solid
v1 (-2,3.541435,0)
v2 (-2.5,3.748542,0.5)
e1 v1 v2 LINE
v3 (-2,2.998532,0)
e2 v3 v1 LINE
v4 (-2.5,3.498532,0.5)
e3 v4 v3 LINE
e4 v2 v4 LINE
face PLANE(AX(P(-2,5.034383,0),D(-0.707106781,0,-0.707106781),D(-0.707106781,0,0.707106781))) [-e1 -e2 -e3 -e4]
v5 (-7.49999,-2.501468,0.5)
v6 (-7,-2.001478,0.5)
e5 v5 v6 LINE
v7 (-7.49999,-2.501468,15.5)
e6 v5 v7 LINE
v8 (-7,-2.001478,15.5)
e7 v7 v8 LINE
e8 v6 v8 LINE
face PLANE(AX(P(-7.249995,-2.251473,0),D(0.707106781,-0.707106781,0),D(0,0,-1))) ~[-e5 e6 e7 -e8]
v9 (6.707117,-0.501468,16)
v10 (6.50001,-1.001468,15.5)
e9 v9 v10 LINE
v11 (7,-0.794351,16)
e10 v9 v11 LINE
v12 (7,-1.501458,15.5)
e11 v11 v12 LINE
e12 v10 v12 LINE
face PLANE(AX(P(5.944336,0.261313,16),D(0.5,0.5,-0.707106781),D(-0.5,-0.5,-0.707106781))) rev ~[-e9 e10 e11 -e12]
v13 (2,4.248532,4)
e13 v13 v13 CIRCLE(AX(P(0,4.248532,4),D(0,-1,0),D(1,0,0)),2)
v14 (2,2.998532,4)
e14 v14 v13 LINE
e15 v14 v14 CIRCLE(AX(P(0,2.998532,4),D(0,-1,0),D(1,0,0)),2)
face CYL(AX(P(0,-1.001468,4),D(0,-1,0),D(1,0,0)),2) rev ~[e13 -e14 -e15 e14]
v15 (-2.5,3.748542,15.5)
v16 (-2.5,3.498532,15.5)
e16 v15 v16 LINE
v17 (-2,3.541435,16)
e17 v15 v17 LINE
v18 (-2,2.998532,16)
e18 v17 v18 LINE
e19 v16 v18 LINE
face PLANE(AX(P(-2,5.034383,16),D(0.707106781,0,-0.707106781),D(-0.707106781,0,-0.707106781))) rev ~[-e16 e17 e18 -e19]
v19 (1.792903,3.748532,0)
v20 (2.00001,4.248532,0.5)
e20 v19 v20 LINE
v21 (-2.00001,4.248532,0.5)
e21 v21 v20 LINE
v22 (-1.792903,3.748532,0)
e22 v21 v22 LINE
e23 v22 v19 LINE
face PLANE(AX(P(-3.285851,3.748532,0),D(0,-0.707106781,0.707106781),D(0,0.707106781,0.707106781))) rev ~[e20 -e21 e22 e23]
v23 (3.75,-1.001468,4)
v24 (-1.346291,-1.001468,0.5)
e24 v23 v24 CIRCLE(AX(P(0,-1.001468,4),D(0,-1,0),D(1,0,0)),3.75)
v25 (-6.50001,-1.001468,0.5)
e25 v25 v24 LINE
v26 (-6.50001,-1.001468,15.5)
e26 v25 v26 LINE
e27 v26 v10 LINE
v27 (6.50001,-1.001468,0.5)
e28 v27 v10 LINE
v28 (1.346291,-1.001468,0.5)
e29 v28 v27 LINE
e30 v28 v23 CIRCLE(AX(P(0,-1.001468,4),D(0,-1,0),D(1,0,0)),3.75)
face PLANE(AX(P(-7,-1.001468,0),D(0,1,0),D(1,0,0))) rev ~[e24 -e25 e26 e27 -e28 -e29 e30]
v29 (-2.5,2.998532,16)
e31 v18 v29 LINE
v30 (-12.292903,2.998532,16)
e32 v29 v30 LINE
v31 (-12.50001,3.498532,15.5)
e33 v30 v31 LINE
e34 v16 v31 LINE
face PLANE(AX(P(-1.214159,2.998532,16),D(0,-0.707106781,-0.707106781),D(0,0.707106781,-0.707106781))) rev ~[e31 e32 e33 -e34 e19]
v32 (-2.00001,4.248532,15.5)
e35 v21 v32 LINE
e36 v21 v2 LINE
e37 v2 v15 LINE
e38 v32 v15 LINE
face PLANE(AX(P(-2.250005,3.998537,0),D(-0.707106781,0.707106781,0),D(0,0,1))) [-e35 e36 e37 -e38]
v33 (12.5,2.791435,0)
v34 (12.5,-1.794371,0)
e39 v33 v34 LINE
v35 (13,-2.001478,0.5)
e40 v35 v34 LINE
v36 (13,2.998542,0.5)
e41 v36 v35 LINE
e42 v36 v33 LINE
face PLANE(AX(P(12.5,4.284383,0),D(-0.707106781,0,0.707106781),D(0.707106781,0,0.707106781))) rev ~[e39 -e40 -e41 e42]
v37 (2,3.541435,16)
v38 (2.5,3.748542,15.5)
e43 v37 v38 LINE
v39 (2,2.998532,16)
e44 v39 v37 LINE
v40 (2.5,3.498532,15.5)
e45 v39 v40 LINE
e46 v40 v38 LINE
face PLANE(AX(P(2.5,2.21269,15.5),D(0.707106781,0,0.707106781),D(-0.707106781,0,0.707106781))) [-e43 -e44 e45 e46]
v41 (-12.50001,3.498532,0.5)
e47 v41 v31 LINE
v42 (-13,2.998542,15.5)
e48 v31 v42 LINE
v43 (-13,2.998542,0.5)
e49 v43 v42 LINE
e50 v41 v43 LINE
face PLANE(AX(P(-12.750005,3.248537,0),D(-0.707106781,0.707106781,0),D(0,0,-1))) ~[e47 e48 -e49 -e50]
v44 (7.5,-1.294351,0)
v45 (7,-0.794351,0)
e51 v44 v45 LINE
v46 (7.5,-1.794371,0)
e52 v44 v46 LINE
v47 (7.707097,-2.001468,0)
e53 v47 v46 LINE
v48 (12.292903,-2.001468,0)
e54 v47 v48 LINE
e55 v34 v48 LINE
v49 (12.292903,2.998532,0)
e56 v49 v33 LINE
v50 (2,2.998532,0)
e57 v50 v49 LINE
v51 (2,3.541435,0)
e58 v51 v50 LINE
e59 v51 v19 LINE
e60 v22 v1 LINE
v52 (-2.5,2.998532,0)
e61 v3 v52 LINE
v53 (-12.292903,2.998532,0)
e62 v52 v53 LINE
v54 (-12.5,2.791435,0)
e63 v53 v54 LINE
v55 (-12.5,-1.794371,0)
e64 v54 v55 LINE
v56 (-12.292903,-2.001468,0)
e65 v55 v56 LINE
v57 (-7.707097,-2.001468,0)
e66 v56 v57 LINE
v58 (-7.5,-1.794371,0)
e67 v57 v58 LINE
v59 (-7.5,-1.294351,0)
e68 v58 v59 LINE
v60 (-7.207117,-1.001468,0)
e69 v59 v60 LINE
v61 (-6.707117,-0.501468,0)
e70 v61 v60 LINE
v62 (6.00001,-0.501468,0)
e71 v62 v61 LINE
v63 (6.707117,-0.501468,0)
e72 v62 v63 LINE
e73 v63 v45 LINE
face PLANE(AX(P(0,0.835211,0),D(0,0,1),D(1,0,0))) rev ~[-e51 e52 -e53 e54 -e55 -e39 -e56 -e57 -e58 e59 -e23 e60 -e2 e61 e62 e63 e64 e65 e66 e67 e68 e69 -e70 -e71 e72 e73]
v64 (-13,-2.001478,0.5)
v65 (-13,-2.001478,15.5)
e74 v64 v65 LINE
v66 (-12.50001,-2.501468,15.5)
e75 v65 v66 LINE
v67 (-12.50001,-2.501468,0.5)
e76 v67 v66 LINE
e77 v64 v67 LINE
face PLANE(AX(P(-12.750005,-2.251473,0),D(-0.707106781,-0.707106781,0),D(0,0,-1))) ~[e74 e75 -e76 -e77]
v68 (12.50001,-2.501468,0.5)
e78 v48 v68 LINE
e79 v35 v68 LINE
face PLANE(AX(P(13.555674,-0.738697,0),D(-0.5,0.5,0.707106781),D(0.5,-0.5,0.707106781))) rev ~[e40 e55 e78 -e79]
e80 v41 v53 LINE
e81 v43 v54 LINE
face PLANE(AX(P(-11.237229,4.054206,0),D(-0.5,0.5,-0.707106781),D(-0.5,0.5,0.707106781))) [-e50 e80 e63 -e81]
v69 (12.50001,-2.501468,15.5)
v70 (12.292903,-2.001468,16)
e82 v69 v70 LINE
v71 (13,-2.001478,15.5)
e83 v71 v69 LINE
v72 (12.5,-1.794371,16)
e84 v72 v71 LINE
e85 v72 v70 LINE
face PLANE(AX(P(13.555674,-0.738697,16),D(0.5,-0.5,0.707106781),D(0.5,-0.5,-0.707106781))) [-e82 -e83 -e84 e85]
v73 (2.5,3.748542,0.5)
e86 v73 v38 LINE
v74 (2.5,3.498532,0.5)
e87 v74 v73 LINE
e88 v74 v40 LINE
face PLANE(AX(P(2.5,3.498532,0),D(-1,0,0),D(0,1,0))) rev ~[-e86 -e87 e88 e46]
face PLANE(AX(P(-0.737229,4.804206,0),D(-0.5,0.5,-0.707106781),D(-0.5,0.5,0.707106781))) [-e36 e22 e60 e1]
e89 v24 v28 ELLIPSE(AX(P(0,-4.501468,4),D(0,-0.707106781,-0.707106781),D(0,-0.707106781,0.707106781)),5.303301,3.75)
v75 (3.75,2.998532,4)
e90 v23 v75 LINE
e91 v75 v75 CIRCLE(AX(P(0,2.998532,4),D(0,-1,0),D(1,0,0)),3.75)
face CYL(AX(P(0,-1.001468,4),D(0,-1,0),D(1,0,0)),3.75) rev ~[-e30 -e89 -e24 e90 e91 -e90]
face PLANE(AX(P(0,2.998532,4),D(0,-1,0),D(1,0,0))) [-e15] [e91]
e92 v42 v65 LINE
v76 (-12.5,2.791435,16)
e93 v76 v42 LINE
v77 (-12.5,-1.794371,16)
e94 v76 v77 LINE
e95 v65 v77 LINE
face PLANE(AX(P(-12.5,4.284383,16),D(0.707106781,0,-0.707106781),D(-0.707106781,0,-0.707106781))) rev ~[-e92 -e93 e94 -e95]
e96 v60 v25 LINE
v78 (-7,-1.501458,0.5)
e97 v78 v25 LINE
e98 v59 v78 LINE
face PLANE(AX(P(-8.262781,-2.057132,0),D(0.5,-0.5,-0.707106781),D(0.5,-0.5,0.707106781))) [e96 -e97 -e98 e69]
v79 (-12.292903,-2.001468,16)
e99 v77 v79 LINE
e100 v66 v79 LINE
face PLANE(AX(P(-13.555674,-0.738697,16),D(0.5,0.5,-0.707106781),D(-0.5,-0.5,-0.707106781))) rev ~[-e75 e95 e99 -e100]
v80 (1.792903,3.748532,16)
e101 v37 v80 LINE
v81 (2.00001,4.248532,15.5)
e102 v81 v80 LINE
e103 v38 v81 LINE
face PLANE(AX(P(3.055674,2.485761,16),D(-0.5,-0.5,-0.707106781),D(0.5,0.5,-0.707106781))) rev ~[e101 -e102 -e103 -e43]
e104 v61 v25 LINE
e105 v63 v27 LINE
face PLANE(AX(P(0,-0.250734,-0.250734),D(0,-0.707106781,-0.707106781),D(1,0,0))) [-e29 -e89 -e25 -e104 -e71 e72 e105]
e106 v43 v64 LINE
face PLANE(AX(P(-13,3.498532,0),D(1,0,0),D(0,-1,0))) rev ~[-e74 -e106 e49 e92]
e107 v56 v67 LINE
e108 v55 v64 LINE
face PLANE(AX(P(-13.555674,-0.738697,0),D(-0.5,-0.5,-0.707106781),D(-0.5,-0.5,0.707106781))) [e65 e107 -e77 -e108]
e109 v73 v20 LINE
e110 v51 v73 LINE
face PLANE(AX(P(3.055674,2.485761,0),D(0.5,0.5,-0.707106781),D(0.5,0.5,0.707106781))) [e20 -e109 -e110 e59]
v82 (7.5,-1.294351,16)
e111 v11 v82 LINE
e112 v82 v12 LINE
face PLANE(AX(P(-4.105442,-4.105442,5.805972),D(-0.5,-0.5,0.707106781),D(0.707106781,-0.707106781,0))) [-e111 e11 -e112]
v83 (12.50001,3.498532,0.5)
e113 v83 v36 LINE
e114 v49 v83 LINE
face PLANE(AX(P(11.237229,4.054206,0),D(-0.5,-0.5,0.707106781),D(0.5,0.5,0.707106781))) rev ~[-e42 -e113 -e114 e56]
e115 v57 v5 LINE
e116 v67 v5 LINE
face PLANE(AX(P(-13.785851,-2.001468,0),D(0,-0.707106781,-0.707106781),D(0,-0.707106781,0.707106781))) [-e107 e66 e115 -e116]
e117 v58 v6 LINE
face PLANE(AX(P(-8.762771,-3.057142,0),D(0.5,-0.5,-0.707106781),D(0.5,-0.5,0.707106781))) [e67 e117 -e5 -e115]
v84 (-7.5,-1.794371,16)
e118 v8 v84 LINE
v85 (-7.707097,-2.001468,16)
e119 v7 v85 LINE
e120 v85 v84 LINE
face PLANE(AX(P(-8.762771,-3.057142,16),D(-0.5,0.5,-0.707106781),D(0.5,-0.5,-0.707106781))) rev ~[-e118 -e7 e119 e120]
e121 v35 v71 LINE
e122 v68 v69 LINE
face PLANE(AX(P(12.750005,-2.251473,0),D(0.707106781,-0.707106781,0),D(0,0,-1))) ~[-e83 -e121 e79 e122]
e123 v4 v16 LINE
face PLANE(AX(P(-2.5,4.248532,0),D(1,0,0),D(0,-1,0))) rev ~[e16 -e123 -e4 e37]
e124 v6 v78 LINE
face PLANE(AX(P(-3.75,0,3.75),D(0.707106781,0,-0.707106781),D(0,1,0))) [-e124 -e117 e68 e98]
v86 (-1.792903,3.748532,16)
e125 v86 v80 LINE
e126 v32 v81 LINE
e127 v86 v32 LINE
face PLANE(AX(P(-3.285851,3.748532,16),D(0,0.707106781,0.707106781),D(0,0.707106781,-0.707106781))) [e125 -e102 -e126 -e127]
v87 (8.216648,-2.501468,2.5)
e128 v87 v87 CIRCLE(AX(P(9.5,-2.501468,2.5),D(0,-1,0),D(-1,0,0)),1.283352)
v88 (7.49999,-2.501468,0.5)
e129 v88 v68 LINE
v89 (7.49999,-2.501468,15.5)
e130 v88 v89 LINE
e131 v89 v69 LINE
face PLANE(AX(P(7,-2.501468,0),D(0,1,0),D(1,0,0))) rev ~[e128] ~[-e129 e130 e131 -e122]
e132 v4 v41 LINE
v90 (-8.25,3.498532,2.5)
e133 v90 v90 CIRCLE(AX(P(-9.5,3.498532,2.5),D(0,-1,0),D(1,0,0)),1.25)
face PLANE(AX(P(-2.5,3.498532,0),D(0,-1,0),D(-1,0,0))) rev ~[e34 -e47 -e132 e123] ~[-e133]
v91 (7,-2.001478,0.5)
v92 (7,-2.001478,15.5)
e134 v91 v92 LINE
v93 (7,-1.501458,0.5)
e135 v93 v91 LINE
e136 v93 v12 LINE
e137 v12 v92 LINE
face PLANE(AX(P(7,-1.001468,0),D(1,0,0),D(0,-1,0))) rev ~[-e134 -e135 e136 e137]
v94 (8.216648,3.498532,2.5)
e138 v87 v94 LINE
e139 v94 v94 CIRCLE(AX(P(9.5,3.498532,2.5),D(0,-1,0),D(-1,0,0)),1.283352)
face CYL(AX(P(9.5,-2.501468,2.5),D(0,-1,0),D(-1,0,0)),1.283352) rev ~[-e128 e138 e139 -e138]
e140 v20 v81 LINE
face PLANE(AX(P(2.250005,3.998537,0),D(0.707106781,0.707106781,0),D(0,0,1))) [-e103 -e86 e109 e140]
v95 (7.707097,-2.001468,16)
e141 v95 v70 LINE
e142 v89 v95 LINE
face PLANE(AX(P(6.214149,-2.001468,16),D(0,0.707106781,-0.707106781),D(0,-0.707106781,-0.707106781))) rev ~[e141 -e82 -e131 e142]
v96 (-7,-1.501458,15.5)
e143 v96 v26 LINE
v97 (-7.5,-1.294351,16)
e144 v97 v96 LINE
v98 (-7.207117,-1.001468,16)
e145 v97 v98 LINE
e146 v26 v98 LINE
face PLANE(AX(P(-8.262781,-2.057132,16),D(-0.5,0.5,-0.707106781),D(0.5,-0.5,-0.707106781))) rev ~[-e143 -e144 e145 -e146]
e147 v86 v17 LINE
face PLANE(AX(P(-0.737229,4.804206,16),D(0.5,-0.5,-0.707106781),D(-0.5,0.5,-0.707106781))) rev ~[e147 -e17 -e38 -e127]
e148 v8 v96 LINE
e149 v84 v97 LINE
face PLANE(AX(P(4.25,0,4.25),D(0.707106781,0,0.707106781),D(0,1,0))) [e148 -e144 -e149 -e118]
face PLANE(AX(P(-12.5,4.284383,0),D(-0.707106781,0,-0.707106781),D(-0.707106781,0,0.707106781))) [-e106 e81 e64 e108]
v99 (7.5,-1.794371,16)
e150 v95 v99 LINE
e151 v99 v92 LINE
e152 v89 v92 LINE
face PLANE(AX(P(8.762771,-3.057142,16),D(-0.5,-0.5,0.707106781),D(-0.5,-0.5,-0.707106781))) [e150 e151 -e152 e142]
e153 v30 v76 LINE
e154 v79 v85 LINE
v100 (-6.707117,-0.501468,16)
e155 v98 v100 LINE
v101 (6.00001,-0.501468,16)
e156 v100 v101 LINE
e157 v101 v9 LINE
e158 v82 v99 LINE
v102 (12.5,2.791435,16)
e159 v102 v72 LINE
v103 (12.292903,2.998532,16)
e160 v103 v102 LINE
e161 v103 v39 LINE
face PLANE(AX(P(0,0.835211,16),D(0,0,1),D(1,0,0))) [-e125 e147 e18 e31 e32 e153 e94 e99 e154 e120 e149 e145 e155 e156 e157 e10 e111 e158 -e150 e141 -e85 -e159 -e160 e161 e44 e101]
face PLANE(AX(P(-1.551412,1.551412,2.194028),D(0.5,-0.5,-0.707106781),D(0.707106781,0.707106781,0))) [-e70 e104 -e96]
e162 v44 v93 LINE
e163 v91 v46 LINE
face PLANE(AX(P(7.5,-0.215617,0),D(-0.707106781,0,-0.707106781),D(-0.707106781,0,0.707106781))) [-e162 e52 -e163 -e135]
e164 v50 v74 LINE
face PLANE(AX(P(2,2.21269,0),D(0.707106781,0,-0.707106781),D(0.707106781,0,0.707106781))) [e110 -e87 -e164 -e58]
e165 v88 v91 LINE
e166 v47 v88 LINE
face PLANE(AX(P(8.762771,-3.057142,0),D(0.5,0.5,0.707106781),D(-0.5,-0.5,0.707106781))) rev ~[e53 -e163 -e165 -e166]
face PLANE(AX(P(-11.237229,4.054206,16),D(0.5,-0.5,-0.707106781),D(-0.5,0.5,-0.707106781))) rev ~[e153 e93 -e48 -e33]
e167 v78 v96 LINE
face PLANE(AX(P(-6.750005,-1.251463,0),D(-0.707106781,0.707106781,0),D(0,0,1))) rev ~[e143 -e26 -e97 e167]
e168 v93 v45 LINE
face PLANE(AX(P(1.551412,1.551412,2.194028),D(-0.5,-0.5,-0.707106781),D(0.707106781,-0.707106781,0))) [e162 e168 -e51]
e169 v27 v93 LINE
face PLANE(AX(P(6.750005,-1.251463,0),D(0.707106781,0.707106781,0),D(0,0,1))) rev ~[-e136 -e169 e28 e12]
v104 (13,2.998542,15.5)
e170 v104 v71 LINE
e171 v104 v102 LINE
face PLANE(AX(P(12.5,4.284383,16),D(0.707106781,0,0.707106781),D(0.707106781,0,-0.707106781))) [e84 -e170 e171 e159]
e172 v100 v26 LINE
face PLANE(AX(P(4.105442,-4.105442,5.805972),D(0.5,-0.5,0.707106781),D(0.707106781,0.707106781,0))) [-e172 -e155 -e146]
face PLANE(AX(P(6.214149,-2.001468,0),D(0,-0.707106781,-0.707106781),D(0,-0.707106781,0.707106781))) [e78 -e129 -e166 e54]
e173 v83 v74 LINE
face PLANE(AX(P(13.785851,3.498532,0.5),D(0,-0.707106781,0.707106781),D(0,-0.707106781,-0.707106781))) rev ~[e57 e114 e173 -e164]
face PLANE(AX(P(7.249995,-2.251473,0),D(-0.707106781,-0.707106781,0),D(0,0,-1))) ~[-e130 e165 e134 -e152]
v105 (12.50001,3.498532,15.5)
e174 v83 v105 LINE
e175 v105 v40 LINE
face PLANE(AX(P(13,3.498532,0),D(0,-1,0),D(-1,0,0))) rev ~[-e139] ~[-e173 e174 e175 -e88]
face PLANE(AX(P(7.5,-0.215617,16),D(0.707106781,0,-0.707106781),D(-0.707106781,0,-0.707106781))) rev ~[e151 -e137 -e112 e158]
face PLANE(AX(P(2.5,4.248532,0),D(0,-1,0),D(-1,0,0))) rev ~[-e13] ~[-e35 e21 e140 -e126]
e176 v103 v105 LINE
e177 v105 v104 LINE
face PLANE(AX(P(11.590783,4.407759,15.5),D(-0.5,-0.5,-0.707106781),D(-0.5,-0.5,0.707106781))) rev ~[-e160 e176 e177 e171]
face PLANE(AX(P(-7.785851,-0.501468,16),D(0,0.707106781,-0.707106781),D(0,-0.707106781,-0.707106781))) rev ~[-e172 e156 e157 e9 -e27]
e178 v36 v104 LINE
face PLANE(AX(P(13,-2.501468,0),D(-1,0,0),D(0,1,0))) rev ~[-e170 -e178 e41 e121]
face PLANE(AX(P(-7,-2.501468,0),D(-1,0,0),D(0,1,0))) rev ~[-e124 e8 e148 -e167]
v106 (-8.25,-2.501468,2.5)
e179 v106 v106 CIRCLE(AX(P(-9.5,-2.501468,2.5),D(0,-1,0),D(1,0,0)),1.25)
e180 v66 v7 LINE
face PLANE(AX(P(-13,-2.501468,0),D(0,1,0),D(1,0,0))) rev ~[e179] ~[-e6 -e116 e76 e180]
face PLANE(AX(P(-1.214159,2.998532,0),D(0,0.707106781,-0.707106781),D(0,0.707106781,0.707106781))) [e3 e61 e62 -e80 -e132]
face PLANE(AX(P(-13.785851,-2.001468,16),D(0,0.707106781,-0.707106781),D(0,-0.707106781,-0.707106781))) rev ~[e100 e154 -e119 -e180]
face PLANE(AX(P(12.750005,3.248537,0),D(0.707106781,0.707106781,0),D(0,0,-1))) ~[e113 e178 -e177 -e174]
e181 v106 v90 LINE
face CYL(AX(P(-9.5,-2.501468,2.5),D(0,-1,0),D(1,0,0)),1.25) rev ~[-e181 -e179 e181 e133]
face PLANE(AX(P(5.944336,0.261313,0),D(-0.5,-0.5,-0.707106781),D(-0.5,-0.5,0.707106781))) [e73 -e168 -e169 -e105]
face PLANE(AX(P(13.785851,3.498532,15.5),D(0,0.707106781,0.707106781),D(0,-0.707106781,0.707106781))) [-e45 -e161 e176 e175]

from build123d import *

# Parameters (mm, degrees)
F1_DEPTH      = 16
F3_R          = 1.25
F4_DEPTH      = 25
F5_R          = 2
F6_DEPTH      = 25
F5_R_2        = 3.75
F7_DEPTH      = 4
F8_SIZE       = 0.49999
F9_T1_DEPTH   = 3.278775627
F9_T3_DEPTH   = 7.571702988
F9_T5_DEPTH   = 3.278775627
F9_T7_DEPTH   = 6.571702988
F9_T9_DEPTH   = 7.571702988
F9_T11_DEPTH  = 3.278775627
F9_T13_DEPTH  = 3.278775627
F9_T15_DEPTH  = 3.278775627
F9_T17_DEPTH  = 7.571702988
F9_T19_DEPTH  = 3.278775627
F9_T24_DEPTH  = 12.571692988
F9_T29_DEPTH  = 2.821692988
F9_T34_DEPTH  = 3.278775627
F9_T39_DEPTH  = 3.278775627
F9_T44_DEPTH  = 2.821692988
F9_T49_DEPTH  = 3.071702988
F9_T54_DEPTH  = 12.571692988
F9_T59_DEPTH  = 3.278775627
F9_T65_DEPTH  = 15.571702988
F9_T71_DEPTH  = 3.278775627
F9_T77_DEPTH  = 3.071702988
F9_T82_DEPTH  = 12.571692988
F9_T87_DEPTH  = 2.821692988
F9_T92_DEPTH  = 3.278775627
F9_T97_DEPTH  = 3.278775627
F9_T102_DEPTH = 2.821692988
F9_T107_DEPTH = 3.071702988
F9_T112_DEPTH = 12.571692988
F9_T117_DEPTH = 3.278775627
F9_T123_DEPTH = 15.571702988
F9_T129_DEPTH = 3.278775627
F9_T135_DEPTH = 3.071702988


# Not quite as in the source:
# - a fillet or chamfer that OpenCascade refuses, or shapes differently, is made with other operations: its cross-section is extruded or revolved along the edge and cut away or added
# - a fillet or chamfer is up to 0.001 mm smaller than in the source, because OpenCascade refuses the exact size


with BuildPart() as f1:
    # F0 (on Top) → F1 (new body)
    with BuildSketch(Plane.XY):
        Polygon((-2.5, 3.4985319469), (-13, 3.4985319469), (-13, -2.5014680531), (-7, -2.5014680531), (-7, -1.0014680531), (7, -1.0014680531), (7, -2.5014680531), (13, -2.5014680531), (13, 3.4985319469), (2.5, 3.4985319469), (2.5, 4.2485319469), (-2.5, 4.2485319469), align=None)
    extrude(amount=F1_DEPTH)

    # F3 (on offset) → F4 (cut)
    with BuildSketch(Plane.XZ.offset(2.5014680531)):
        with Locations((-9.5, 2.5)):
            Circle(F3_R)
        with BuildLine():
            ThreePointArc((10.7833518404, 2.5), (9.5, 3.7833518404), (8.2166481596, 2.5))
            ThreePointArc((8.2166481596, 2.5), (9.5, 1.2166481596), (10.7833518404, 2.5))
        make_face()
    extrude(amount=-F4_DEPTH, mode=Mode.SUBTRACT)

    # F5 (on face) → F6 (cut)
    with BuildSketch(Plane.XZ.offset(1.0014680531)):
        with Locations((0, 4)):
            Circle(F5_R)
    extrude(amount=-F6_DEPTH, mode=Mode.SUBTRACT)

    # F5 (on face) → F7 (cut)
    with BuildSketch(Plane.XZ.offset(1.0014680531)):
        with Locations((0, 4)):
            Circle(F5_R_2)
        with Locations((0, 4)):
            Circle(F5_R, mode=Mode.SUBTRACT)
    extrude(amount=-F7_DEPTH, mode=Mode.SUBTRACT)

    # F8 (size 0.5 in the source; OpenCascade refuses exactly that, so slightly less here)
    f8_edges = [f1.edges().sort_by_distance(p)[0] for p in [
        (-2.5, 4.248532, 8),
        (2.5, 4.248532, 8),
        (13, 3.498532, 8),
        (-13, 3.498532, 8),
        (-13, -2.501468, 8),
        (7, -2.501468, 8),
        (13, -2.501468, 8),
        (-7, -2.501468, 8),
        (-7, -1.001468, 8),
        (7, -1.001468, 8),
    ]]
    chamfer(f8_edges, length=F8_SIZE)

    # F9: chamfer of 0.5 on 44 edges, made by hand

    # F9_s2 → F9_t1 (cut)
    with BuildSketch(Plane(origin=(3.5915117866, -3.5915117866, 0), x_dir=(0, 0, 1), z_dir=(0.7071067812, -0.7071067812, 0))):
        Polygon((15.5, -11.3126774998), (16, -10.8126774998), (16, -11.3126774998), align=None)
        Polygon((0, -10.8126774998), (0.5, -11.3126774998), (0, -11.3126774998), align=None)
    extrude(amount=F9_T1_DEPTH, mode=Mode.SUBTRACT)

    # F9_s4 → F9_t3 (cut)
    with BuildSketch(Plane.XZ.offset(-4.2843834409)):
        Polygon((12.5, 16), (13, 15.5), (13, 16), align=None)
        Polygon((-12.5, 16), (-13, 15.5), (-13, 16), align=None)
        Polygon((12.5, 0), (13, 0.5), (13, 0), align=None)
        Polygon((-12.5, 0), (-13, 0.5), (-13, 0), align=None)
    extrude(amount=F9_T3_DEPTH, mode=Mode.SUBTRACT)

    # F9_s6 → F9_t5 (cut)
    with BuildSketch(Plane(origin=(6.4084882134, 6.4084882134, 0), x_dir=(0, 0, 1), z_dir=(-0.7071067812, -0.7071067812, 0))):
        Polygon((16, -10.1076468592), (15.5, -10.6076468592), (16, -10.6076468592), align=None)
        Polygon((0, -10.1076468592), (0.5, -10.6076468592), (0, -10.6076468592), align=None)
    extrude(amount=F9_T5_DEPTH, mode=Mode.SUBTRACT)

    # F9_s8 → F9_t7 (cut)
    with BuildSketch(Plane.YZ.offset(-3.285851494)):
        Polygon((3.7485319469, 16), (4.2485319469, 15.5), (4.2485319469, 16), align=None)
        Polygon((3.7485319469, 0), (4.2485319469, 0.5), (4.2485319469, 0), align=None)
    extrude(amount=F9_T7_DEPTH, mode=Mode.SUBTRACT)

    # F9_s10 → F9_t9 (cut)
    with BuildSketch(Plane.YZ.offset(6.214148506)):
        Polygon((-2.0014680531, 16), (-2.5014680531, 15.5), (-2.5014680531, 16), align=None)
        Polygon((-2.0014680531, 0), (-2.5014680531, 0.5), (-2.5014680531, 0), align=None)
    extrude(amount=F9_T9_DEPTH, mode=Mode.SUBTRACT)

    # F9_s12 → F9_t11 (cut)
    with BuildSketch(Plane(origin=(5.9099562665, -5.9099562665, 0), x_dir=(0, 0, 1), z_dir=(-0.7071067812, 0.7071067812, 0))):
        Polygon((16, 4.0344887646), (15.5, 3.5344887646), (16, 3.5344887646), align=None)
        Polygon((0, 4.0344887646), (0.5, 3.5344887646), (0, 3.5344887646), align=None)
    extrude(amount=F9_T11_DEPTH, mode=Mode.SUBTRACT)

    # F9_s14 → F9_t13 (cut)
    with BuildSketch(Plane(origin=(-3.5915117866, -3.5915117866, 0), x_dir=(0, 0, 1), z_dir=(-0.7071067812, -0.7071067812, 0))):
        Polygon((16, 10.8126774998), (15.5, 11.3126774998), (16, 11.3126774998), align=None)
        Polygon((0, 10.8126774998), (0.5, 11.3126774998), (0, 11.3126774998), align=None)
    extrude(amount=F9_T13_DEPTH, mode=Mode.SUBTRACT)

    # F9_s16 → F9_t15 (cut)
    with BuildSketch(Plane(origin=(-6.4084882134, 6.4084882134, 0), x_dir=(0, 0, 1), z_dir=(0.7071067812, -0.7071067812, 0))):
        Polygon((16, 10.1076468592), (15.5, 10.6076468592), (16, 10.6076468592), align=None)
        Polygon((0, 10.1076468592), (0.5, 10.6076468592), (0, 10.6076468592), align=None)
    extrude(amount=F9_T15_DEPTH, mode=Mode.SUBTRACT)

    # F9_s18 → F9_t17 (cut)
    with BuildSketch(Plane.YZ.offset(-13.785851494)):
        Polygon((-2.0014680531, 16), (-2.5014680531, 15.5), (-2.5014680531, 16), align=None)
        Polygon((-2.0014680531, 0), (-2.5014680531, 0.5), (-2.5014680531, 0), align=None)
    extrude(amount=F9_T17_DEPTH, mode=Mode.SUBTRACT)

    # F9_s20 → F9_t19 (cut)
    with BuildSketch(Plane(origin=(-5.9099562665, -5.9099562665, 0), x_dir=(0, 0, 1), z_dir=(0.7071067812, 0.7071067812, 0))):
        Polygon((16, -4.0344887646), (15.5, -3.5344887646), (16, -3.5344887646), align=None)
        Polygon((0, -4.0344887646), (0.5, -3.5344887646), (0, -3.5344887646), align=None)
    extrude(amount=F9_T19_DEPTH, mode=Mode.SUBTRACT)


with BuildPart() as f9_tool22:
    # F9_s23 → F9_t24 (new body)
    with BuildSketch(Plane.YZ.offset(13.785851494)):
        Polygon((3.4985319469, 15.5), (2.9985319469, 16), (3.4985319469, 16), align=None)
    extrude(amount=-F9_T24_DEPTH)

    split(bisect_by=Plane(origin=(9, 0, 9), x_dir=(0, 1, 0), z_dir=(0.7071067812, 0, 0.7071067812)), keep=Keep.TOP)


with BuildPart() as f1_1:
    add(f1.part)

    # F9_t21: cut F9_tool22
    add(f9_tool22.part, mode=Mode.SUBTRACT)


with BuildPart() as f9_tool27:
    # F9_s28 → F9_t29 (new body)
    with BuildSketch(Plane.XZ.offset(-2.2126904529)):
        Polygon((2.5, 15.5), (2, 16), (2.5, 16), align=None)
    extrude(amount=-F9_T29_DEPTH)

    split(bisect_by=Plane(origin=(0, 9.4992659735, 9.4992659735), x_dir=(1, 0, 0), z_dir=(0, 0.7071067812, 0.7071067812)), keep=Keep.TOP)


with BuildPart() as f1_2:
    add(f1_1.part)

    # F9_t26: cut F9_tool27
    add(f9_tool27.part, mode=Mode.SUBTRACT)


with BuildPart() as f9_tool32:
    # F9_s33 → F9_t34 (new body)
    with BuildSketch(Plane(origin=(0.2849562665, -0.2849562665, 0), x_dir=(0, 0, 1), z_dir=(-0.7071067812, 0.7071067812, 0))):
        Polygon((16, 3.9183863832), (15.5, 4.4183863832), (16, 4.4183863832), align=None)
    extrude(amount=F9_T34_DEPTH)

    split(bisect_by=Plane.YZ.offset(2.5), keep=Keep.BOTTOM)


with BuildPart() as f1_3:
    add(f1_2.part)

    # F9_t31: cut F9_tool32
    add(f9_tool32.part, mode=Mode.SUBTRACT)


with BuildPart() as f9_tool37:
    # F9_s38 → F9_t39 (new body)
    with BuildSketch(Plane(origin=(2.0334882134, 2.0334882134, 0), x_dir=(0, 0, 1), z_dir=(-0.7071067812, -0.7071067812, 0))):
        Polygon((16, 3.9183863832), (15.5, 4.4183863832), (16, 4.4183863832), align=None)
    extrude(amount=F9_T39_DEPTH)

    split(bisect_by=Plane.YZ.offset(-2.5), keep=Keep.TOP)


with BuildPart() as f1_4:
    add(f1_3.part)

    # F9_t36: cut F9_tool37
    add(f9_tool37.part, mode=Mode.SUBTRACT)


with BuildPart() as f9_tool42:
    # F9_s43 → F9_t44 (new body)
    with BuildSketch(Plane.XZ.offset(-5.0343834409)):
        Polygon((-2, 16), (-2.5, 15.5), (-2.5, 16), align=None)
    extrude(amount=F9_T44_DEPTH)

    split(bisect_by=Plane(origin=(0, 9.4992659735, 9.4992659735), x_dir=(1, 0, 0), z_dir=(0, 0.7071067812, 0.7071067812)), keep=Keep.TOP)


with BuildPart() as f1_5:
    add(f1_4.part)

    # F9_t41: cut F9_tool42
    add(f9_tool42.part, mode=Mode.SUBTRACT)


with BuildPart() as f9_tool47:
    # F9_s48 → F9_t49 (new body)
    with BuildSketch(Plane.XZ.offset(0.2156165591)):
        Polygon((7.5, 16), (7, 15.5), (7, 16), align=None)
    extrude(amount=F9_T49_DEPTH)

    split(bisect_by=Plane(origin=(-4.1054420675, -4.1054420675, 5.8059718513), x_dir=(0.7071067812, -0.7071067812, 0), z_dir=(-0.5, -0.5, 0.7071067812)), keep=Keep.TOP)


with BuildPart() as f1_6:
    add(f1_5.part)

    # F9_t46: cut F9_tool47
    add(f9_tool47.part, mode=Mode.SUBTRACT)


with BuildPart() as f9_tool52:
    # F9_s53 → F9_t54 (new body)
    with BuildSketch(Plane.YZ.offset(-1.214158506)):
        Polygon((2.9985319469, 16), (3.4985319469, 15.5), (3.4985319469, 16), align=None)
    extrude(amount=-F9_T54_DEPTH)

    split(bisect_by=Plane(origin=(-9, 0, 9), x_dir=(0, 1, 0), z_dir=(-0.7071067812, 0, 0.7071067812)), keep=Keep.TOP)


with BuildPart() as f1_7:
    add(f1_6.part)

    # F9_t51: cut F9_tool52
    add(f9_tool52.part, mode=Mode.SUBTRACT)


with BuildPart() as f9_tool57:
    # F9_s58 → F9_t59 (new body)
    with BuildSketch(Plane(origin=(2.8415117866, -2.8415117866, 0), x_dir=(0, 0, 1), z_dir=(0.7071067812, -0.7071067812, 0))):
        Polygon((16, -4.3880562973), (15.5, -3.8880562973), (16, -3.8880562973), align=None)
    extrude(amount=F9_T59_DEPTH)

    split(bisect_by=Plane(origin=(0, -8.2507340265, 8.2507340265), x_dir=(1, 0, 0), z_dir=(0, -0.7071067812, 0.7071067812)), keep=Keep.TOP)

    split(bisect_by=Plane(origin=(-4.25, 0, 4.25), x_dir=(0, 1, 0), z_dir=(-0.7071067812, 0, 0.7071067812)), keep=Keep.TOP)


with BuildPart() as f1_8:
    add(f1_7.part)

    # F9_t56: cut F9_tool57
    add(f9_tool57.part, mode=Mode.SUBTRACT)


with BuildPart() as f9_tool63:
    # F9_s64 → F9_t65 (new body)
    with BuildSketch(Plane.YZ.offset(-7.785851494)):
        Polygon((-0.5014680531, 16), (-1.0014680531, 15.5), (-1.0014680531, 16), align=None)
    extrude(amount=F9_T65_DEPTH)

    split(bisect_by=Plane(origin=(-4.1054420675, -4.1054420675, 5.8059718513), x_dir=(0.7071067812, -0.7071067812, 0), z_dir=(-0.5, -0.5, 0.7071067812)), keep=Keep.TOP)

    split(bisect_by=Plane(origin=(4.1054420675, -4.1054420675, 5.8059718513), x_dir=(0.7071067812, 0.7071067812, 0), z_dir=(0.5, -0.5, 0.7071067812)), keep=Keep.TOP)


with BuildPart() as f1_9:
    add(f1_8.part)

    # F9_t62: cut F9_tool63
    add(f9_tool63.part, mode=Mode.SUBTRACT)


with BuildPart() as f9_tool69:
    # F9_s70 → F9_t71 (new body)
    with BuildSketch(Plane(origin=(-5.1599562665, -5.1599562665, 0), x_dir=(0, 0, 1), z_dir=(0.7071067812, 0.7071067812, 0))):
        Polygon((16, -4.3880562973), (15.5, -3.8880562973), (16, -3.8880562973), align=None)
    extrude(amount=F9_T71_DEPTH)

    split(bisect_by=Plane(origin=(0, -8.2507340265, 8.2507340265), x_dir=(1, 0, 0), z_dir=(0, -0.7071067812, 0.7071067812)), keep=Keep.TOP)

    split(bisect_by=Plane(origin=(4.25, 0, 4.25), x_dir=(0, 1, 0), z_dir=(0.7071067812, 0, 0.7071067812)), keep=Keep.TOP)


with BuildPart() as f1_10:
    add(f1_9.part)

    # F9_t68: cut F9_tool69
    add(f9_tool69.part, mode=Mode.SUBTRACT)


with BuildPart() as f9_tool75:
    # F9_s76 → F9_t77 (new body)
    with BuildSketch(Plane.XZ.offset(3.2873195471)):
        Polygon((-7.5, 16), (-7, 15.5), (-7, 16), align=None)
    extrude(amount=-F9_T77_DEPTH)

    split(bisect_by=Plane(origin=(4.1054420675, -4.1054420675, 5.8059718513), x_dir=(0.7071067812, 0.7071067812, 0), z_dir=(0.5, -0.5, 0.7071067812)), keep=Keep.TOP)


with BuildPart() as f1_11:
    add(f1_10.part)

    # F9_t74: cut F9_tool75
    add(f9_tool75.part, mode=Mode.SUBTRACT)


with BuildPart() as f9_tool80:
    # F9_s81 → F9_t82 (new body)
    with BuildSketch(Plane.YZ.offset(13.785851494)):
        Polygon((3.4985319469, 0.5), (2.9985319469, 0), (3.4985319469, 0), align=None)
    extrude(amount=-F9_T82_DEPTH)

    split(bisect_by=Plane(origin=(1, 0, -1), x_dir=(0, 1, 0), z_dir=(0.7071067812, 0, -0.7071067812)), keep=Keep.TOP)


with BuildPart() as f1_12:
    add(f1_11.part)

    # F9_t79: cut F9_tool80
    add(f9_tool80.part, mode=Mode.SUBTRACT)


with BuildPart() as f9_tool85:
    # F9_s86 → F9_t87 (new body)
    with BuildSketch(Plane.XZ.offset(-2.2126904529)):
        Polygon((2, 0), (2.5, 0.5), (2.5, 0), align=None)
    extrude(amount=-F9_T87_DEPTH)

    split(bisect_by=Plane(origin=(0, 1.4992659735, -1.4992659735), x_dir=(1, 0, 0), z_dir=(0, 0.7071067812, -0.7071067812)), keep=Keep.TOP)


with BuildPart() as f1_13:
    add(f1_12.part)

    # F9_t84: cut F9_tool85
    add(f9_tool85.part, mode=Mode.SUBTRACT)


with BuildPart() as f9_tool90:
    # F9_s91 → F9_t92 (new body)
    with BuildSketch(Plane(origin=(0.2849562665, -0.2849562665, 0), x_dir=(0, 0, 1), z_dir=(-0.7071067812, 0.7071067812, 0))):
        Polygon((0, 3.9183863832), (0.5, 4.4183863832), (0, 4.4183863832), align=None)
    extrude(amount=F9_T92_DEPTH)

    split(bisect_by=Plane.YZ.offset(2.5), keep=Keep.BOTTOM)


with BuildPart() as f1_14:
    add(f1_13.part)

    # F9_t89: cut F9_tool90
    add(f9_tool90.part, mode=Mode.SUBTRACT)


with BuildPart() as f9_tool95:
    # F9_s96 → F9_t97 (new body)
    with BuildSketch(Plane(origin=(2.0334882134, 2.0334882134, 0), x_dir=(0, 0, 1), z_dir=(-0.7071067812, -0.7071067812, 0))):
        Polygon((0, 3.9183863832), (0.5, 4.4183863832), (0, 4.4183863832), align=None)
    extrude(amount=F9_T97_DEPTH)

    split(bisect_by=Plane.YZ.offset(-2.5), keep=Keep.TOP)


with BuildPart() as f1_15:
    add(f1_14.part)

    # F9_t94: cut F9_tool95
    add(f9_tool95.part, mode=Mode.SUBTRACT)


with BuildPart() as f9_tool100:
    # F9_s101 → F9_t102 (new body)
    with BuildSketch(Plane.XZ.offset(-5.0343834409)):
        Polygon((-2, 0), (-2.5, 0.5), (-2.5, 0), align=None)
    extrude(amount=F9_T102_DEPTH)

    split(bisect_by=Plane(origin=(0, 1.4992659735, -1.4992659735), x_dir=(1, 0, 0), z_dir=(0, 0.7071067812, -0.7071067812)), keep=Keep.TOP)


with BuildPart() as f1_16:
    add(f1_15.part)

    # F9_t99: cut F9_tool100
    add(f9_tool100.part, mode=Mode.SUBTRACT)


with BuildPart() as f9_tool105:
    # F9_s106 → F9_t107 (new body)
    with BuildSketch(Plane.XZ.offset(0.2156165591)):
        Polygon((7.5, 0), (7, 0.5), (7, 0), align=None)
    extrude(amount=F9_T107_DEPTH)

    split(bisect_by=Plane(origin=(1.551412182, 1.551412182, 2.1940281487), x_dir=(0.7071067812, -0.7071067812, 0), z_dir=(-0.5, -0.5, -0.7071067812)), keep=Keep.TOP)


with BuildPart() as f1_17:
    add(f1_16.part)

    # F9_t104: cut F9_tool105
    add(f9_tool105.part, mode=Mode.SUBTRACT)


with BuildPart() as f9_tool110:
    # F9_s111 → F9_t112 (new body)
    with BuildSketch(Plane.YZ.offset(-1.214158506)):
        Polygon((2.9985319469, 0), (3.4985319469, 0.5), (3.4985319469, 0), align=None)
    extrude(amount=-F9_T112_DEPTH)

    split(bisect_by=Plane(origin=(-1, 0, -1), x_dir=(0, 1, 0), z_dir=(-0.7071067812, 0, -0.7071067812)), keep=Keep.TOP)


with BuildPart() as f1_18:
    add(f1_17.part)

    # F9_t109: cut F9_tool110
    add(f9_tool110.part, mode=Mode.SUBTRACT)


with BuildPart() as f9_tool115:
    # F9_s116 → F9_t117 (new body)
    with BuildSketch(Plane(origin=(2.8415117866, -2.8415117866, 0), x_dir=(0, 0, 1), z_dir=(0.7071067812, -0.7071067812, 0))):
        Polygon((0, -4.3880562973), (0.5, -3.8880562973), (0, -3.8880562973), align=None)
    extrude(amount=F9_T117_DEPTH)

    split(bisect_by=Plane(origin=(0, -0.2507340265, -0.2507340265), x_dir=(1, 0, 0), z_dir=(0, -0.7071067812, -0.7071067812)), keep=Keep.TOP)

    split(bisect_by=Plane(origin=(3.75, 0, 3.75), x_dir=(0, 1, 0), z_dir=(-0.7071067812, 0, -0.7071067812)), keep=Keep.TOP)


with BuildPart() as f1_19:
    add(f1_18.part)

    # F9_t114: cut F9_tool115
    add(f9_tool115.part, mode=Mode.SUBTRACT)


with BuildPart() as f9_tool121:
    # F9_s122 → F9_t123 (new body)
    with BuildSketch(Plane.YZ.offset(-7.785851494)):
        Polygon((-0.5014680531, 0), (-1.0014680531, 0.5), (-1.0014680531, 0), align=None)
    extrude(amount=F9_T123_DEPTH)

    split(bisect_by=Plane(origin=(1.551412182, 1.551412182, 2.1940281487), x_dir=(0.7071067812, -0.7071067812, 0), z_dir=(-0.5, -0.5, -0.7071067812)), keep=Keep.TOP)

    split(bisect_by=Plane(origin=(-1.551412182, 1.551412182, 2.1940281487), x_dir=(0.7071067812, 0.7071067812, 0), z_dir=(0.5, -0.5, -0.7071067812)), keep=Keep.TOP)


with BuildPart() as f1_20:
    add(f1_19.part)

    # F9_t120: cut F9_tool121
    add(f9_tool121.part, mode=Mode.SUBTRACT)


with BuildPart() as f9_tool127:
    # F9_s128 → F9_t129 (new body)
    with BuildSketch(Plane(origin=(-5.1599562665, -5.1599562665, 0), x_dir=(0, 0, 1), z_dir=(0.7071067812, 0.7071067812, 0))):
        Polygon((0, -4.3880562973), (0.5, -3.8880562973), (0, -3.8880562973), align=None)
    extrude(amount=F9_T129_DEPTH)

    split(bisect_by=Plane(origin=(0, -0.2507340265, -0.2507340265), x_dir=(1, 0, 0), z_dir=(0, -0.7071067812, -0.7071067812)), keep=Keep.TOP)

    split(bisect_by=Plane(origin=(-3.75, 0, 3.75), x_dir=(0, 1, 0), z_dir=(0.7071067812, 0, -0.7071067812)), keep=Keep.TOP)


with BuildPart() as f1_21:
    add(f1_20.part)

    # F9_t126: cut F9_tool127
    add(f9_tool127.part, mode=Mode.SUBTRACT)


with BuildPart() as f9_tool133:
    # F9_s134 → F9_t135 (new body)
    with BuildSketch(Plane.XZ.offset(3.2873195471)):
        Polygon((-7.5, 0), (-7, 0.5), (-7, 0), align=None)
    extrude(amount=-F9_T135_DEPTH)

    split(bisect_by=Plane(origin=(-1.551412182, 1.551412182, 2.1940281487), x_dir=(0.7071067812, 0.7071067812, 0), z_dir=(0.5, -0.5, -0.7071067812)), keep=Keep.TOP)


with BuildPart() as f1_22:
    add(f1_21.part)

    # F9_t132: cut F9_tool133
    add(f9_tool133.part, mode=Mode.SUBTRACT)


solid = f1_22.part
